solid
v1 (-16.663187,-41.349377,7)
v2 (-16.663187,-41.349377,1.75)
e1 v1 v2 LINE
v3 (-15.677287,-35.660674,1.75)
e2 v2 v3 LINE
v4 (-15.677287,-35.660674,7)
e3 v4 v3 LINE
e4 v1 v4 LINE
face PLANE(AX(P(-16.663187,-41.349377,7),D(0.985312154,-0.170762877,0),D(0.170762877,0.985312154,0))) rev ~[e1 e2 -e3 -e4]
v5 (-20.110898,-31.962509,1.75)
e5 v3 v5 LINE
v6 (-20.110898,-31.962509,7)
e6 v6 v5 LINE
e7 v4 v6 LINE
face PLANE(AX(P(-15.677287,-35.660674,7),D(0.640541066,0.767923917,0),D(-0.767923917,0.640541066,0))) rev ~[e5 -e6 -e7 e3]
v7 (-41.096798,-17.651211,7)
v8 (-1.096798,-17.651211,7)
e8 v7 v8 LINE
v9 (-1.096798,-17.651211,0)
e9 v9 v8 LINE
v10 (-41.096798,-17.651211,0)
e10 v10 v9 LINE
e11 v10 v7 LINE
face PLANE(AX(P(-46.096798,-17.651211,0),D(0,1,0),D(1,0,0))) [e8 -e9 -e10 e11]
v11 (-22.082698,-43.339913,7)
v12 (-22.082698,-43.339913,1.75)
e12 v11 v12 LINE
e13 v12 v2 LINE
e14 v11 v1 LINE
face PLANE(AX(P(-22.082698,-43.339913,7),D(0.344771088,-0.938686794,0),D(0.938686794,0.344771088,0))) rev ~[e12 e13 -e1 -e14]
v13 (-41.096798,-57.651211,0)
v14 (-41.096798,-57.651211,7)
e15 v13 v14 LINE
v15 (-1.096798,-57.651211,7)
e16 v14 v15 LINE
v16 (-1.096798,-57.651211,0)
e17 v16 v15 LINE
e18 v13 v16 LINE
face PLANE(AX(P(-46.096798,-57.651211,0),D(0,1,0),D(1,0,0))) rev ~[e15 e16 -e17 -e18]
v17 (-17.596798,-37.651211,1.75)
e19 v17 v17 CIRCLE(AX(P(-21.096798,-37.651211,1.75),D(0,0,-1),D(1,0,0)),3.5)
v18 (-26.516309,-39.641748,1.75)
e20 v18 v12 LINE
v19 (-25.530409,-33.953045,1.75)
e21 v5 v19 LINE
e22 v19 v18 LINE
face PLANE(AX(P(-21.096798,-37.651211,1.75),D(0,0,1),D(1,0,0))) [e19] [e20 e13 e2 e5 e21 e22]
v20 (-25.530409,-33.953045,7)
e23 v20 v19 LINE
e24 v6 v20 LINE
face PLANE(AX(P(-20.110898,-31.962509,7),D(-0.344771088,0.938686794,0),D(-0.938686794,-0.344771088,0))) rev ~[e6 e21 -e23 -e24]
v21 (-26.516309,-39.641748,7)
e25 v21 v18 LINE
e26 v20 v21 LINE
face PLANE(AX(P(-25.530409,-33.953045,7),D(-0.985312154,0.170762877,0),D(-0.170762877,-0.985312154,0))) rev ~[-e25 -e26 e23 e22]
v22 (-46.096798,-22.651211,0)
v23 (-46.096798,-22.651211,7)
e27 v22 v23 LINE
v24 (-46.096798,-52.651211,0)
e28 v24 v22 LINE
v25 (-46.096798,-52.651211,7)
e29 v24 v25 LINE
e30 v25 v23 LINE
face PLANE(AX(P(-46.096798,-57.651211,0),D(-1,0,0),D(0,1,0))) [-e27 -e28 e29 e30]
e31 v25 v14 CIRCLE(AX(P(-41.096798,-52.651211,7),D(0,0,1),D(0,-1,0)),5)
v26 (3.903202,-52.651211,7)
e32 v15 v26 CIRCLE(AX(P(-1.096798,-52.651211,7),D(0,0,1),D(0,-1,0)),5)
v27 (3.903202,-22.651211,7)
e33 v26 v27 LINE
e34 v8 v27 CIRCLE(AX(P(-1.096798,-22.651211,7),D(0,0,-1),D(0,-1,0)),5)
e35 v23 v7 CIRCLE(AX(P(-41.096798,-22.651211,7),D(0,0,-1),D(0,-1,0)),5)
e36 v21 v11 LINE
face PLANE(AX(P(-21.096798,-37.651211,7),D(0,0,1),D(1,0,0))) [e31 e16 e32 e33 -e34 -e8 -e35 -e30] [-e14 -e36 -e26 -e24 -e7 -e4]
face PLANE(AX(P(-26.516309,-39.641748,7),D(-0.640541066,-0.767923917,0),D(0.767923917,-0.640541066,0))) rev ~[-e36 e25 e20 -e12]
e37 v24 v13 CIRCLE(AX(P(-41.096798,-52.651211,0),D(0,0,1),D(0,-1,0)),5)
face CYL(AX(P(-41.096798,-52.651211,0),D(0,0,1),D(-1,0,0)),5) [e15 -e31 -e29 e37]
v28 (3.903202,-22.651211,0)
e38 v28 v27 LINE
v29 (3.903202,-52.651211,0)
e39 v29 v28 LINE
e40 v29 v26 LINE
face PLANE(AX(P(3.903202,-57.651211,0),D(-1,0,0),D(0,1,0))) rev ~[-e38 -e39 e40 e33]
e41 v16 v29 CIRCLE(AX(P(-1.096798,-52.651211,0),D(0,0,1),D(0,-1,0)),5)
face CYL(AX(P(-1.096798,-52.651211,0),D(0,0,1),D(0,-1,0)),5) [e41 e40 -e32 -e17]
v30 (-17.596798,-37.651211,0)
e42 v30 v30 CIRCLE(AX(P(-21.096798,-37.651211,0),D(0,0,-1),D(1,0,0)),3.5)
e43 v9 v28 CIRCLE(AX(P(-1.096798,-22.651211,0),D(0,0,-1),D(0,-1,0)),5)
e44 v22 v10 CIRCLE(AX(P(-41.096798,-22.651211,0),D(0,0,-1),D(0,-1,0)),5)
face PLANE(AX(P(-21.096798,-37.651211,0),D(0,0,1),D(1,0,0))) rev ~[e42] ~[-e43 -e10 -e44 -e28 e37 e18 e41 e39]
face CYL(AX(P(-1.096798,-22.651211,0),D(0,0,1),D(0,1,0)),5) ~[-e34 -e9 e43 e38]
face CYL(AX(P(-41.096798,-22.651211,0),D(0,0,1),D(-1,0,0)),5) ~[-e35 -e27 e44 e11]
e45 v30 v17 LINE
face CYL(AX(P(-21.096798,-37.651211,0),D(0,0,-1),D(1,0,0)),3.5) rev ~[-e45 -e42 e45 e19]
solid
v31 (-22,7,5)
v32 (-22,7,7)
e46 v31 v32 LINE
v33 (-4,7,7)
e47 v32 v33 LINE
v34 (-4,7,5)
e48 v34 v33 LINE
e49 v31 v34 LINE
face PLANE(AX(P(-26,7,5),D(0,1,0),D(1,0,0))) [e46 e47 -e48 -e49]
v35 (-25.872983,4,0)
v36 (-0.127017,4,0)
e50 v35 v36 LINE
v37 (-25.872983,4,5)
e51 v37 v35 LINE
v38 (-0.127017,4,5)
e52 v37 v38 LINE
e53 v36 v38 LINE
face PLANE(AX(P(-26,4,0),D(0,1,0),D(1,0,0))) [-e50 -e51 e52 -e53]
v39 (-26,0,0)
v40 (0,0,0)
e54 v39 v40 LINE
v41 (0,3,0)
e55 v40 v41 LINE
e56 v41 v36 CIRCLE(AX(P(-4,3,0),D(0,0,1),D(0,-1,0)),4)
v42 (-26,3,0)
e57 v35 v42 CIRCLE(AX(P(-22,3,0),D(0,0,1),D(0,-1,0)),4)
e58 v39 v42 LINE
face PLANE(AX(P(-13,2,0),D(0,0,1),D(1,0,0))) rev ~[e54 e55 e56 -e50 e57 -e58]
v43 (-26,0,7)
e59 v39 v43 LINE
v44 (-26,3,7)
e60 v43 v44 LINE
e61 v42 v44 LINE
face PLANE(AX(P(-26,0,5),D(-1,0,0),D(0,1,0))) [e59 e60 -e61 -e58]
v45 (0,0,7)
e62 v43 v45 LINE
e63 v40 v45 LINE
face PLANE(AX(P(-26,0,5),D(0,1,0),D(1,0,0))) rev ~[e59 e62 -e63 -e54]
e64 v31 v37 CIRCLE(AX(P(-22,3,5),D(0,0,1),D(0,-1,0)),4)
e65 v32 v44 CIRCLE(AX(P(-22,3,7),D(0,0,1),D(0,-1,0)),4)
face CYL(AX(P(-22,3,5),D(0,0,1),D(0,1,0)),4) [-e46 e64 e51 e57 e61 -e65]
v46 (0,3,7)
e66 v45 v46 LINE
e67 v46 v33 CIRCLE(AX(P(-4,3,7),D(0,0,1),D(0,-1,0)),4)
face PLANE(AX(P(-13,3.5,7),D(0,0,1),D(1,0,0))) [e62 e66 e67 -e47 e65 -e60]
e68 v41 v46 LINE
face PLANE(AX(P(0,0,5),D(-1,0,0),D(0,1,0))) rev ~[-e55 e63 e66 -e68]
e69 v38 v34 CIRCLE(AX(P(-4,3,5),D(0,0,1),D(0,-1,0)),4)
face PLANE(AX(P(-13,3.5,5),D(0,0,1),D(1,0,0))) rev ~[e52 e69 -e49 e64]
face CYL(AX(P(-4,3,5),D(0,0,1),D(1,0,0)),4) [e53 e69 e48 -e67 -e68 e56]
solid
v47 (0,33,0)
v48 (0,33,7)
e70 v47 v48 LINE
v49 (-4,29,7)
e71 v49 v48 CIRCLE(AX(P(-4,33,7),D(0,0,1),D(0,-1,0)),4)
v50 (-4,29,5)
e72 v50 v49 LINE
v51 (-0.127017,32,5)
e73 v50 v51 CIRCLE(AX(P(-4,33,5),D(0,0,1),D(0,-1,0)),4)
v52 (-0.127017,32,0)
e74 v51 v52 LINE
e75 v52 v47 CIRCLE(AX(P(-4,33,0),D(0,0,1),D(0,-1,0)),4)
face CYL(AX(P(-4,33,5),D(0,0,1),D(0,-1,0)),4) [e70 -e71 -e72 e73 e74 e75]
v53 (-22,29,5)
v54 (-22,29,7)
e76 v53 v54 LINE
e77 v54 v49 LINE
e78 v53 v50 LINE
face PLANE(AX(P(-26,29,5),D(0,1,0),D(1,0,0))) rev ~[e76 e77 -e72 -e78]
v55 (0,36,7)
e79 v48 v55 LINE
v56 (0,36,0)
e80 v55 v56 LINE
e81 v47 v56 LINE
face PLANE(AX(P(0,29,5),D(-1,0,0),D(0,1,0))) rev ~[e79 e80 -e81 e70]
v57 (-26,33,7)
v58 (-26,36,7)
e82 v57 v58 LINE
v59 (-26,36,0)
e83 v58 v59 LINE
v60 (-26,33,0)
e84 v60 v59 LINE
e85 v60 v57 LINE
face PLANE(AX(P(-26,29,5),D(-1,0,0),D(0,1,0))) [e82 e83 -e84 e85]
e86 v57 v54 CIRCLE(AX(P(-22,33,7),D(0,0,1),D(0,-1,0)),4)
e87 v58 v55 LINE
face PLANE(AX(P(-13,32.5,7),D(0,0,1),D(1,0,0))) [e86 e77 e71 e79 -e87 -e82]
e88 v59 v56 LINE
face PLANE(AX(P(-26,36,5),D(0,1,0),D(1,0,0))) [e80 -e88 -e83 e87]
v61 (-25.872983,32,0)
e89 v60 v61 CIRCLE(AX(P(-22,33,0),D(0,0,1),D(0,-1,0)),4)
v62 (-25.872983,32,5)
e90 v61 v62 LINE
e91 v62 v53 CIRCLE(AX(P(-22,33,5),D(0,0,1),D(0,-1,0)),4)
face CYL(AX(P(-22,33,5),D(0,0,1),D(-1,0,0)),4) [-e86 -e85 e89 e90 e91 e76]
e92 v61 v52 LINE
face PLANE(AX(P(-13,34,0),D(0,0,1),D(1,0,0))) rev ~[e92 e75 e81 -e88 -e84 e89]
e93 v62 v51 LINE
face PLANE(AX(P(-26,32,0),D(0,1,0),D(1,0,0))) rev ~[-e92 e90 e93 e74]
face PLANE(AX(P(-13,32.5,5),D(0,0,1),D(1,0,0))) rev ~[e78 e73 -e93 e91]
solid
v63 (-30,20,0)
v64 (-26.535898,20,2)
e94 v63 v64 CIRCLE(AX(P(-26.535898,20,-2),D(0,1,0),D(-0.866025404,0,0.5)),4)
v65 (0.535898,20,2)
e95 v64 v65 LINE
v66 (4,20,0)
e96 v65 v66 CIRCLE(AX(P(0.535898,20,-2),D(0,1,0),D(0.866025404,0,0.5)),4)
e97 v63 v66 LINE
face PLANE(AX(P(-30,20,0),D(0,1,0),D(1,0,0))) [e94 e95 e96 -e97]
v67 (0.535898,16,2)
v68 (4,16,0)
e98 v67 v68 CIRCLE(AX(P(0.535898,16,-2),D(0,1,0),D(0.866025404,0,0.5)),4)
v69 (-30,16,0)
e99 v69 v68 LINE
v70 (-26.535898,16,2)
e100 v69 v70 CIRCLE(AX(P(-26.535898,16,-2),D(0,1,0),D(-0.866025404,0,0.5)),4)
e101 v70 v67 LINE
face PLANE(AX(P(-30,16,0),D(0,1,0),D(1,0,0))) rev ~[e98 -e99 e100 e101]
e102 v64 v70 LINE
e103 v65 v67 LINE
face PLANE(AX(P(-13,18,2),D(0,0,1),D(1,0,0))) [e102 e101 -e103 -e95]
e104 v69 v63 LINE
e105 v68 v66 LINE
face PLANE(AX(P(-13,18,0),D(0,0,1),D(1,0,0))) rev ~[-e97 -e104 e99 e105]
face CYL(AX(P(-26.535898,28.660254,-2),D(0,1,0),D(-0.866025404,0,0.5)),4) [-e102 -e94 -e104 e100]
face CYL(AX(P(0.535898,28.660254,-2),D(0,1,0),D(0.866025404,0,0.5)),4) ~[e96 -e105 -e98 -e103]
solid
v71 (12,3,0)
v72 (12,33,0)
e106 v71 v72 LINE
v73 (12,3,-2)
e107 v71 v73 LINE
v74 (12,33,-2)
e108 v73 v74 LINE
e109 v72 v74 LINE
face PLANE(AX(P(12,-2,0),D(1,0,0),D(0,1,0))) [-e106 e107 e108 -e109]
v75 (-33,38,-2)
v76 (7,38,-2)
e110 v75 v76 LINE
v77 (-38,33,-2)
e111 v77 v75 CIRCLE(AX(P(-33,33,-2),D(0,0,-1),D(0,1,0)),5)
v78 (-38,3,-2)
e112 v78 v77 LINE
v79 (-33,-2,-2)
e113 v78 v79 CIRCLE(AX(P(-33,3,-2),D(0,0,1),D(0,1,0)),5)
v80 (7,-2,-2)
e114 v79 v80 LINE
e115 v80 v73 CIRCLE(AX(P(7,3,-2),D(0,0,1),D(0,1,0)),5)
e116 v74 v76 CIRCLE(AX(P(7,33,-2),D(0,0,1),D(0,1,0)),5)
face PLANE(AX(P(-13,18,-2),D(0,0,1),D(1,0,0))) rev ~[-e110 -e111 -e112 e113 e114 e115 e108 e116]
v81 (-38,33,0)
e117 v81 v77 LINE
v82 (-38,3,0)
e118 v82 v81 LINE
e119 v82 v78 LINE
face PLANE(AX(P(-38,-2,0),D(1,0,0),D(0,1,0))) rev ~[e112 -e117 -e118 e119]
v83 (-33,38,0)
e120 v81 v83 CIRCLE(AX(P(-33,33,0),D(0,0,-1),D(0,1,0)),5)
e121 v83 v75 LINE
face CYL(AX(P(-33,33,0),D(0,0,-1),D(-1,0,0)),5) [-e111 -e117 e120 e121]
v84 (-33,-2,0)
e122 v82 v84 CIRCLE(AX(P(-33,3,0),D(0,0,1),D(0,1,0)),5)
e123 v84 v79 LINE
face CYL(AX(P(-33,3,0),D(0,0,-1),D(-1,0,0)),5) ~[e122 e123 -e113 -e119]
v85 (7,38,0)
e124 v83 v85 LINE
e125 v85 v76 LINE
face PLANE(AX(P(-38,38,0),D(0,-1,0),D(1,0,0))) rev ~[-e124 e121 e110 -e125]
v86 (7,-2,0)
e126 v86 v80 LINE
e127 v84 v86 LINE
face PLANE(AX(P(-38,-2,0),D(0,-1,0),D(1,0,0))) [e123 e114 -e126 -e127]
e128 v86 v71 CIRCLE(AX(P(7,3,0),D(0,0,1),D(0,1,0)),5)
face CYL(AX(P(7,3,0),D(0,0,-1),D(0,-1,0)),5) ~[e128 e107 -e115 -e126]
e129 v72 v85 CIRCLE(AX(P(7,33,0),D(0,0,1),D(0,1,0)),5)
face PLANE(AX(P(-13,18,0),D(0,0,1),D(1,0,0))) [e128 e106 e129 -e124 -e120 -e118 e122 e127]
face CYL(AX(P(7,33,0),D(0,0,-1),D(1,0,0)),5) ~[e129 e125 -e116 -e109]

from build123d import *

# Parameters (mm, degrees)
F0_W           = 26
F0_H           = 4
F1_DEPTH       = 5
F2_W           = 26
F2_H           = 7
F3_DEPTH       = 2
F4_W           = 34
F4_H           = 4
F5_DEPTH       = 2
F6_W           = 50
F6_H           = 40
F7_DEPTH       = 2
F8_W           = 50
F8_H           = 40
F9_DEPTH       = 7
F11_R          = 3.5
F12_DEPTH      = 7.001
F13_DEPTH      = 5.25
F14_F1_R       = 4
F14_F2_R       = 4
F14_2_F1_R     = 4
F14_2_F2_R     = 4
F14_3_T1_DEPTH = 21.3205080757
F15_R          = 5
F16_R          = 5


# Not quite as in the source:
# - a fillet or chamfer that OpenCascade refuses, or shapes differently, is made with other operations: its cross-section is extruded or revolved along the edge and cut away or added


with BuildPart() as f1:
    # F0 (on Top) → F1 (new body)
    with BuildSketch(Plane.XY):
        with Locations((-13, 2)):
            Rectangle(F0_W, F0_H)
    extrude(amount=F1_DEPTH)

    # F2 (on face) → F3 (join)
    with BuildSketch(Plane.XY.offset(5)):
        with Locations((-13, 3.5)):
            Rectangle(F2_W, F2_H)
    extrude(amount=F3_DEPTH)

    # F14: fillet of radius 4 on 2 edges, made by hand

    # F14_f1
    f14_f1_edges = [f1.edges().sort_by_distance(p)[0] for p in [
        (0, 7, 6),
    ]]
    fillet(f14_f1_edges, radius=F14_F1_R)

    # F14_f2
    f14_f2_edges = [f1.edges().sort_by_distance(p)[0] for p in [
        (-26, 7, 6),
    ]]
    fillet(f14_f2_edges, radius=F14_F2_R)


with BuildPart() as f1b:
    # F0 (on Top) → F1, piece 2 (new body)
    with BuildSketch(Plane.XY):
        with Locations((-13, 34)):
            Rectangle(F0_W, F0_H)
    extrude(amount=F1_DEPTH)

    # F2 (on face) → F3, piece 2 (join)
    with BuildSketch(Plane.XY.offset(5)):
        with Locations((-13, 32.5)):
            Rectangle(F2_W, F2_H)
    extrude(amount=F3_DEPTH)

    # F14#2: fillet of radius 4 on 2 edges, made by hand

    # F14_2_f1
    f14_2_f1_edges = [f1b.edges().sort_by_distance(p)[0] for p in [
        (-26, 29, 6),
    ]]
    fillet(f14_2_f1_edges, radius=F14_2_F1_R)

    # F14_2_f2
    f14_2_f2_edges = [f1b.edges().sort_by_distance(p)[0] for p in [
        (0, 29, 6),
    ]]
    fillet(f14_2_f2_edges, radius=F14_2_F2_R)


with BuildPart() as f5:
    # F4 (on Top) → F5 (new body)
    with BuildSketch(Plane.XY):
        with Locations((-13, 18)):
            Rectangle(F4_W, F4_H)
    extrude(amount=F5_DEPTH)

    # F14#3: fillet of radius 4 on 2 edges, made by hand

    # F14_3_s2 → F14_3_t1 (cut)
    with BuildSketch(Plane.XZ.offset(-28.6602540378)):
        with BuildLine():
            ThreePointArc((4, 0), (2.5358983849, 1.4641016151), (0.5358983849, 2))
            Line((0.5358983849, 2), (4, 2))
            Line((4, 2), (4, 0))
        make_face()
        with BuildLine():
            ThreePointArc((-30, 0), (-28.5358983849, 1.4641016151), (-26.5358983849, 2))
            Line((-26.5358983849, 2), (-30, 2))
            Line((-30, 2), (-30, 0))
        make_face()
    extrude(amount=F14_3_T1_DEPTH, mode=Mode.SUBTRACT)


with BuildPart() as f7:
    # F6 (on Top) → F7 (new body)
    with BuildSketch(Plane.XY):
        with Locations((-13, 18)):
            Rectangle(F6_W, F6_H)
    extrude(amount=-F7_DEPTH)

    # F15
    f15_edges = [f7.edges().sort_by_distance(p)[0] for p in [
        (12, -2, -1),
        (12, 38, -1),
        (-38, -2, -1),
        (-38, 38, -1),
    ]]
    fillet(f15_edges, radius=F15_R)


with BuildPart() as f9:
    # F8 (on Top) → F9 (new body)
    with BuildSketch(Plane.XY):
        with Locations((-21.0967977971, -37.6512110233)):
            Rectangle(F8_W, F8_H)
    extrude(amount=F9_DEPTH)

    # F11 (on face) → F12 (cut, through all)
    with BuildSketch(Plane(origin=(0, 0, 0), x_dir=(1, 0, 0), z_dir=(0, 0, -1))):
        with Locations((-21.0967977971, 37.6512110233)):
            Circle(F11_R)
    extrude(amount=-F12_DEPTH, mode=Mode.SUBTRACT)

    # F10 (on face) → F13 (cut)
    with BuildSketch(Plane.XY.offset(7)):
        Polygon((-20.1108978699, -31.9625086522), (-25.5304086014, -33.9530454552), (-26.5163085287, -39.6417478263), (-22.0826977244, -43.3399133944), (-16.6631869928, -41.3493765914), (-15.6772870656, -35.6606742204), align=None)
    extrude(amount=-F13_DEPTH, mode=Mode.SUBTRACT)

    # F16
    f16_edges = [f9.edges().sort_by_distance(p)[0] for p in [
        (-46.096798, -17.651211, 3.5),
        (3.903202, -17.651211, 3.5),
        (-46.096798, -57.651211, 3.5),
        (3.903202, -57.651211, 3.5),
    ]]
    fillet(f16_edges, radius=F16_R)


solid = Compound([f1.part, f1b.part, f5.part, f7.part, f9.part])
